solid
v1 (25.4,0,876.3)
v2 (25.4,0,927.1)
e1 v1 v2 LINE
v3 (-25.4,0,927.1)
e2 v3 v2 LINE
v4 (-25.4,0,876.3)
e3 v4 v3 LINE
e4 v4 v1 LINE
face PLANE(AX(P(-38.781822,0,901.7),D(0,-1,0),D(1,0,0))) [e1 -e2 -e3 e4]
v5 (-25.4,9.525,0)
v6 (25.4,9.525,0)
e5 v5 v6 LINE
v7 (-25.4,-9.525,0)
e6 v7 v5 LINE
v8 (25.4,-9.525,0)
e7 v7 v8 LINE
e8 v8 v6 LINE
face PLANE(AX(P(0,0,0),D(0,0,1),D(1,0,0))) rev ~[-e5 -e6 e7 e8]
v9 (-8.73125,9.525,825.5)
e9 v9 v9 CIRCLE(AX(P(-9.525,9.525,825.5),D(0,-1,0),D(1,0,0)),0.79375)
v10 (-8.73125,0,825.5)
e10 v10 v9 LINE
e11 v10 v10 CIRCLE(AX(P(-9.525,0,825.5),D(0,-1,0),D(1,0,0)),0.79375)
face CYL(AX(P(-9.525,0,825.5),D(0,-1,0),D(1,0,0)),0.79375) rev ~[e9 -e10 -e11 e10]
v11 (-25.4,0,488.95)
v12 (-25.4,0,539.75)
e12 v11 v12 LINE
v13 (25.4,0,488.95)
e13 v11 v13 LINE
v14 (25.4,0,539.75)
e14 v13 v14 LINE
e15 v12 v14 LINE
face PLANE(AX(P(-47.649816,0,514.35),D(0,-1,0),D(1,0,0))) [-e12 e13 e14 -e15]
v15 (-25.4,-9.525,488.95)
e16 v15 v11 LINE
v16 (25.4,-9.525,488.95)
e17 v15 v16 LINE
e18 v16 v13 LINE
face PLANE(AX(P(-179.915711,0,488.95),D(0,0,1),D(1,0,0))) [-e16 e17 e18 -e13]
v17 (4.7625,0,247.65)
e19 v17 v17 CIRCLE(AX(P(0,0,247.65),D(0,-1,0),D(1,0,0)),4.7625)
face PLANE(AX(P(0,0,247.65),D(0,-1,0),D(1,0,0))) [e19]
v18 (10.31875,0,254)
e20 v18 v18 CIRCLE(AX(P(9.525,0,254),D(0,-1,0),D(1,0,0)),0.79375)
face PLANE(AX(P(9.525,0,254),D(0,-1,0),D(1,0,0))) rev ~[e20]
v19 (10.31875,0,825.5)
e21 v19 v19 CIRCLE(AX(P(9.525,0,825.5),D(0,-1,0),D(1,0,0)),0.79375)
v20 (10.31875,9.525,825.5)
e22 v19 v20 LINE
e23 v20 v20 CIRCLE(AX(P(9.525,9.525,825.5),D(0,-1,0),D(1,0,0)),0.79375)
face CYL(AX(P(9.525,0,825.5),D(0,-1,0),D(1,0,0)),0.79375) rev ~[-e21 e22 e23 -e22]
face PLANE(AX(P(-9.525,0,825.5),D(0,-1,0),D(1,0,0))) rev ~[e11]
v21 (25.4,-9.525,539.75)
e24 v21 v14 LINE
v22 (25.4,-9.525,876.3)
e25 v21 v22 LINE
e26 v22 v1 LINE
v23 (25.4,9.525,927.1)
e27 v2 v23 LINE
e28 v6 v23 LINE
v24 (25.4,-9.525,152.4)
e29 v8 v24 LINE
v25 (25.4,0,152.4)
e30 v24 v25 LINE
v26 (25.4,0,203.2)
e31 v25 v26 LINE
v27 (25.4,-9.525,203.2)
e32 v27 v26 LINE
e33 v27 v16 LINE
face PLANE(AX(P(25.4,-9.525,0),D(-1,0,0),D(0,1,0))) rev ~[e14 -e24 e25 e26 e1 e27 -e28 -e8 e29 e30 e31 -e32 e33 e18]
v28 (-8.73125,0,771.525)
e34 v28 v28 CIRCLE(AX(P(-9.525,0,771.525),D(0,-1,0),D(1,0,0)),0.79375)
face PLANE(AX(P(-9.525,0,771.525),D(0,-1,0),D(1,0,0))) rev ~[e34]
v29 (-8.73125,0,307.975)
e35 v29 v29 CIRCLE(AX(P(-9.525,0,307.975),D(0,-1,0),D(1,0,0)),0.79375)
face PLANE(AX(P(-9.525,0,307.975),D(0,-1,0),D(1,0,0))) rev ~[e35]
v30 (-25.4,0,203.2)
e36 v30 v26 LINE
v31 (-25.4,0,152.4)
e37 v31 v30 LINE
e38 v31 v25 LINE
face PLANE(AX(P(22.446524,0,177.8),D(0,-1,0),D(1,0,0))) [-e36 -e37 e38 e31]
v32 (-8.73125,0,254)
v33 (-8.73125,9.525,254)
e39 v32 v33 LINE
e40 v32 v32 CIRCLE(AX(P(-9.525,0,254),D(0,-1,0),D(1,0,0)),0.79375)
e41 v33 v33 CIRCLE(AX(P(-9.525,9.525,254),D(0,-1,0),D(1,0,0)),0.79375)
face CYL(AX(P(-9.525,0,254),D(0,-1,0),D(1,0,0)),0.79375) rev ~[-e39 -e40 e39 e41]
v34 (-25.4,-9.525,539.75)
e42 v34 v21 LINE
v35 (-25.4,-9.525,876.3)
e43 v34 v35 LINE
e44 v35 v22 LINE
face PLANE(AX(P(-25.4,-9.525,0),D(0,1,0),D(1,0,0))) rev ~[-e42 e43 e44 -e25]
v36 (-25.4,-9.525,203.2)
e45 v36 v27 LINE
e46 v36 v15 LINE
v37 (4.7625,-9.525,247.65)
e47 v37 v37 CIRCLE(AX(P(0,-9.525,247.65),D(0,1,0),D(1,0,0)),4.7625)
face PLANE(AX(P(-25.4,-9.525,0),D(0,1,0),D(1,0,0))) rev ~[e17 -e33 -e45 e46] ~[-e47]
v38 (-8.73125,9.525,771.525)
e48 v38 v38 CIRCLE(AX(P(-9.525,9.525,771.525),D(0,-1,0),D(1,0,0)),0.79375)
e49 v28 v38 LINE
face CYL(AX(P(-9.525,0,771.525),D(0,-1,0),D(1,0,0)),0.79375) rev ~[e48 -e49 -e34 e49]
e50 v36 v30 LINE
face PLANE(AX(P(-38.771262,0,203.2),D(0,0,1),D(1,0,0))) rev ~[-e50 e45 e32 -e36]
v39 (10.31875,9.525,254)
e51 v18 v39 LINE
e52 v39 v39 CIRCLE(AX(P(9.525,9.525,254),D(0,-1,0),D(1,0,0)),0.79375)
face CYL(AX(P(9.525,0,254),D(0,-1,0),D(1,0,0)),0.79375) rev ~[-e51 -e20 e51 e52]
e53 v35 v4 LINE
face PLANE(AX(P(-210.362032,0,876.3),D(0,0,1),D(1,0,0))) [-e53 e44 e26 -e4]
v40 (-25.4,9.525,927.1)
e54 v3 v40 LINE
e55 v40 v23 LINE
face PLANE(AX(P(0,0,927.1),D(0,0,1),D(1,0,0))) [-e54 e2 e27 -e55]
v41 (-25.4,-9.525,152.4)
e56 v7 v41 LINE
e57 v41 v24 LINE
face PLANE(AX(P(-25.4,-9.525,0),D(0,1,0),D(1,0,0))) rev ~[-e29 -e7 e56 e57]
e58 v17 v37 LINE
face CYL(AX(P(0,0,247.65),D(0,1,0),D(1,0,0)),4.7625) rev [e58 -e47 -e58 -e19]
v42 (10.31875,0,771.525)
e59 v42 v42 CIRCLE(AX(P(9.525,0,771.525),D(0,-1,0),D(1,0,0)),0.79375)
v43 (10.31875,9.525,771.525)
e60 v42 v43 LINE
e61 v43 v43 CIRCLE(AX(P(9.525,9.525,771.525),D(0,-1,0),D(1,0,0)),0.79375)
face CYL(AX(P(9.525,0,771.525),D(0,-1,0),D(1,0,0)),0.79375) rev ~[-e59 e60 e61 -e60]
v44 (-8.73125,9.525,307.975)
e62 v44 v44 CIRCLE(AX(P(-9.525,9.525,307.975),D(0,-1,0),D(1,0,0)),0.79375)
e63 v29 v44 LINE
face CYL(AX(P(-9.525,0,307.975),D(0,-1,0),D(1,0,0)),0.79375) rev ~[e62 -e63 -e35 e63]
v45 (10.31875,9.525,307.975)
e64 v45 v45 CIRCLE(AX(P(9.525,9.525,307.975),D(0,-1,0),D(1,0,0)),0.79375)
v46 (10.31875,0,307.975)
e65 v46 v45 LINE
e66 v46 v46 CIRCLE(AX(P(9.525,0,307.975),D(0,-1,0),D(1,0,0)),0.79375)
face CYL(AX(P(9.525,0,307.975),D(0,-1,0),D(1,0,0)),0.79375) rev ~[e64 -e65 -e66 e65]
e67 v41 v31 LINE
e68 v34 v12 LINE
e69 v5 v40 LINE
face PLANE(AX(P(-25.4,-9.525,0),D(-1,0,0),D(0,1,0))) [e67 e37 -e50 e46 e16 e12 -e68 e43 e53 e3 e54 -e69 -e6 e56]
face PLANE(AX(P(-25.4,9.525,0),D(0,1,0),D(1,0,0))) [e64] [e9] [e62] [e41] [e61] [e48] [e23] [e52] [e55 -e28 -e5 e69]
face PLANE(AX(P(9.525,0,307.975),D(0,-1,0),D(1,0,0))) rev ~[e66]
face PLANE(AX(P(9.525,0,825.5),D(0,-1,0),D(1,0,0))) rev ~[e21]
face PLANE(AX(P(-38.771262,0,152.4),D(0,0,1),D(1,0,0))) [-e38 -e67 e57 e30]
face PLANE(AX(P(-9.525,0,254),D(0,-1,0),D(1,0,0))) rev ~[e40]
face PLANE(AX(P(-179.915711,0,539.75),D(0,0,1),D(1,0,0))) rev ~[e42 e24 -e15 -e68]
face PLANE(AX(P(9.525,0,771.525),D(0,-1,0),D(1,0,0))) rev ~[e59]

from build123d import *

# Parameters (mm, degrees)
F0_W     = 50.8
F0_H     = 19.05
F1_DEPTH = 927.1
F2_W     = 122.43557321
F2_H     = 50.8
F2_W_2   = 343.1604206562
F2_W_3   = 264.5317912102
F3_DEPTH = 25.4
F4_R     = 0.79375
F5_DEPTH = 25.4
F6_R     = 4.7625
F7_DEPTH = 25.4


# Not quite as in the source:
# - a feature names something its author has since deleted; it is built from what else it names


with BuildPart() as f1:
    # F0 (on Top) → F1 (new body)
    with BuildSketch(Plane.XY):
        Rectangle(F0_W, F0_H)
    extrude(amount=F1_DEPTH)

    # F2 (on Front) → F3 (cut)
    with BuildSketch(Plane.XZ):
        with Locations((22.4465244144, 177.8)):
            Rectangle(F2_W, F2_H)
        with Locations((-38.7818217278, 901.7)):
            Rectangle(F2_W_2, F2_H)
        with Locations((-47.6498156786, 514.35)):
            Rectangle(F2_W_3, F2_H)
    extrude(amount=F3_DEPTH, mode=Mode.SUBTRACT)

    # F4 (on Front) → F5 (cut)
    with BuildSketch(Plane.XZ):
        with Locations((9.525, 254)):
            Circle(F4_R)
        with Locations((9.525, 307.975)):
            Circle(F4_R)
        with Locations((9.525, 771.525)):
            Circle(F4_R)
        with Locations((9.525, 825.5)):
            Circle(F4_R)
        with Locations((-9.525, 771.525)):
            Circle(F4_R)
        with Locations((-9.525, 825.5)):
            Circle(F4_R)
        with Locations((-9.525, 254)):
            Circle(F4_R)
        with Locations((-9.525, 307.975)):
            Circle(F4_R)
    extrude(amount=-F5_DEPTH, mode=Mode.SUBTRACT)

    # F6 (on Front) → F7 (cut)
    with BuildSketch(Plane.XZ):
        with Locations((0, 247.65)):
            Circle(F6_R)
    extrude(amount=F7_DEPTH, mode=Mode.SUBTRACT)


solid = f1.part
